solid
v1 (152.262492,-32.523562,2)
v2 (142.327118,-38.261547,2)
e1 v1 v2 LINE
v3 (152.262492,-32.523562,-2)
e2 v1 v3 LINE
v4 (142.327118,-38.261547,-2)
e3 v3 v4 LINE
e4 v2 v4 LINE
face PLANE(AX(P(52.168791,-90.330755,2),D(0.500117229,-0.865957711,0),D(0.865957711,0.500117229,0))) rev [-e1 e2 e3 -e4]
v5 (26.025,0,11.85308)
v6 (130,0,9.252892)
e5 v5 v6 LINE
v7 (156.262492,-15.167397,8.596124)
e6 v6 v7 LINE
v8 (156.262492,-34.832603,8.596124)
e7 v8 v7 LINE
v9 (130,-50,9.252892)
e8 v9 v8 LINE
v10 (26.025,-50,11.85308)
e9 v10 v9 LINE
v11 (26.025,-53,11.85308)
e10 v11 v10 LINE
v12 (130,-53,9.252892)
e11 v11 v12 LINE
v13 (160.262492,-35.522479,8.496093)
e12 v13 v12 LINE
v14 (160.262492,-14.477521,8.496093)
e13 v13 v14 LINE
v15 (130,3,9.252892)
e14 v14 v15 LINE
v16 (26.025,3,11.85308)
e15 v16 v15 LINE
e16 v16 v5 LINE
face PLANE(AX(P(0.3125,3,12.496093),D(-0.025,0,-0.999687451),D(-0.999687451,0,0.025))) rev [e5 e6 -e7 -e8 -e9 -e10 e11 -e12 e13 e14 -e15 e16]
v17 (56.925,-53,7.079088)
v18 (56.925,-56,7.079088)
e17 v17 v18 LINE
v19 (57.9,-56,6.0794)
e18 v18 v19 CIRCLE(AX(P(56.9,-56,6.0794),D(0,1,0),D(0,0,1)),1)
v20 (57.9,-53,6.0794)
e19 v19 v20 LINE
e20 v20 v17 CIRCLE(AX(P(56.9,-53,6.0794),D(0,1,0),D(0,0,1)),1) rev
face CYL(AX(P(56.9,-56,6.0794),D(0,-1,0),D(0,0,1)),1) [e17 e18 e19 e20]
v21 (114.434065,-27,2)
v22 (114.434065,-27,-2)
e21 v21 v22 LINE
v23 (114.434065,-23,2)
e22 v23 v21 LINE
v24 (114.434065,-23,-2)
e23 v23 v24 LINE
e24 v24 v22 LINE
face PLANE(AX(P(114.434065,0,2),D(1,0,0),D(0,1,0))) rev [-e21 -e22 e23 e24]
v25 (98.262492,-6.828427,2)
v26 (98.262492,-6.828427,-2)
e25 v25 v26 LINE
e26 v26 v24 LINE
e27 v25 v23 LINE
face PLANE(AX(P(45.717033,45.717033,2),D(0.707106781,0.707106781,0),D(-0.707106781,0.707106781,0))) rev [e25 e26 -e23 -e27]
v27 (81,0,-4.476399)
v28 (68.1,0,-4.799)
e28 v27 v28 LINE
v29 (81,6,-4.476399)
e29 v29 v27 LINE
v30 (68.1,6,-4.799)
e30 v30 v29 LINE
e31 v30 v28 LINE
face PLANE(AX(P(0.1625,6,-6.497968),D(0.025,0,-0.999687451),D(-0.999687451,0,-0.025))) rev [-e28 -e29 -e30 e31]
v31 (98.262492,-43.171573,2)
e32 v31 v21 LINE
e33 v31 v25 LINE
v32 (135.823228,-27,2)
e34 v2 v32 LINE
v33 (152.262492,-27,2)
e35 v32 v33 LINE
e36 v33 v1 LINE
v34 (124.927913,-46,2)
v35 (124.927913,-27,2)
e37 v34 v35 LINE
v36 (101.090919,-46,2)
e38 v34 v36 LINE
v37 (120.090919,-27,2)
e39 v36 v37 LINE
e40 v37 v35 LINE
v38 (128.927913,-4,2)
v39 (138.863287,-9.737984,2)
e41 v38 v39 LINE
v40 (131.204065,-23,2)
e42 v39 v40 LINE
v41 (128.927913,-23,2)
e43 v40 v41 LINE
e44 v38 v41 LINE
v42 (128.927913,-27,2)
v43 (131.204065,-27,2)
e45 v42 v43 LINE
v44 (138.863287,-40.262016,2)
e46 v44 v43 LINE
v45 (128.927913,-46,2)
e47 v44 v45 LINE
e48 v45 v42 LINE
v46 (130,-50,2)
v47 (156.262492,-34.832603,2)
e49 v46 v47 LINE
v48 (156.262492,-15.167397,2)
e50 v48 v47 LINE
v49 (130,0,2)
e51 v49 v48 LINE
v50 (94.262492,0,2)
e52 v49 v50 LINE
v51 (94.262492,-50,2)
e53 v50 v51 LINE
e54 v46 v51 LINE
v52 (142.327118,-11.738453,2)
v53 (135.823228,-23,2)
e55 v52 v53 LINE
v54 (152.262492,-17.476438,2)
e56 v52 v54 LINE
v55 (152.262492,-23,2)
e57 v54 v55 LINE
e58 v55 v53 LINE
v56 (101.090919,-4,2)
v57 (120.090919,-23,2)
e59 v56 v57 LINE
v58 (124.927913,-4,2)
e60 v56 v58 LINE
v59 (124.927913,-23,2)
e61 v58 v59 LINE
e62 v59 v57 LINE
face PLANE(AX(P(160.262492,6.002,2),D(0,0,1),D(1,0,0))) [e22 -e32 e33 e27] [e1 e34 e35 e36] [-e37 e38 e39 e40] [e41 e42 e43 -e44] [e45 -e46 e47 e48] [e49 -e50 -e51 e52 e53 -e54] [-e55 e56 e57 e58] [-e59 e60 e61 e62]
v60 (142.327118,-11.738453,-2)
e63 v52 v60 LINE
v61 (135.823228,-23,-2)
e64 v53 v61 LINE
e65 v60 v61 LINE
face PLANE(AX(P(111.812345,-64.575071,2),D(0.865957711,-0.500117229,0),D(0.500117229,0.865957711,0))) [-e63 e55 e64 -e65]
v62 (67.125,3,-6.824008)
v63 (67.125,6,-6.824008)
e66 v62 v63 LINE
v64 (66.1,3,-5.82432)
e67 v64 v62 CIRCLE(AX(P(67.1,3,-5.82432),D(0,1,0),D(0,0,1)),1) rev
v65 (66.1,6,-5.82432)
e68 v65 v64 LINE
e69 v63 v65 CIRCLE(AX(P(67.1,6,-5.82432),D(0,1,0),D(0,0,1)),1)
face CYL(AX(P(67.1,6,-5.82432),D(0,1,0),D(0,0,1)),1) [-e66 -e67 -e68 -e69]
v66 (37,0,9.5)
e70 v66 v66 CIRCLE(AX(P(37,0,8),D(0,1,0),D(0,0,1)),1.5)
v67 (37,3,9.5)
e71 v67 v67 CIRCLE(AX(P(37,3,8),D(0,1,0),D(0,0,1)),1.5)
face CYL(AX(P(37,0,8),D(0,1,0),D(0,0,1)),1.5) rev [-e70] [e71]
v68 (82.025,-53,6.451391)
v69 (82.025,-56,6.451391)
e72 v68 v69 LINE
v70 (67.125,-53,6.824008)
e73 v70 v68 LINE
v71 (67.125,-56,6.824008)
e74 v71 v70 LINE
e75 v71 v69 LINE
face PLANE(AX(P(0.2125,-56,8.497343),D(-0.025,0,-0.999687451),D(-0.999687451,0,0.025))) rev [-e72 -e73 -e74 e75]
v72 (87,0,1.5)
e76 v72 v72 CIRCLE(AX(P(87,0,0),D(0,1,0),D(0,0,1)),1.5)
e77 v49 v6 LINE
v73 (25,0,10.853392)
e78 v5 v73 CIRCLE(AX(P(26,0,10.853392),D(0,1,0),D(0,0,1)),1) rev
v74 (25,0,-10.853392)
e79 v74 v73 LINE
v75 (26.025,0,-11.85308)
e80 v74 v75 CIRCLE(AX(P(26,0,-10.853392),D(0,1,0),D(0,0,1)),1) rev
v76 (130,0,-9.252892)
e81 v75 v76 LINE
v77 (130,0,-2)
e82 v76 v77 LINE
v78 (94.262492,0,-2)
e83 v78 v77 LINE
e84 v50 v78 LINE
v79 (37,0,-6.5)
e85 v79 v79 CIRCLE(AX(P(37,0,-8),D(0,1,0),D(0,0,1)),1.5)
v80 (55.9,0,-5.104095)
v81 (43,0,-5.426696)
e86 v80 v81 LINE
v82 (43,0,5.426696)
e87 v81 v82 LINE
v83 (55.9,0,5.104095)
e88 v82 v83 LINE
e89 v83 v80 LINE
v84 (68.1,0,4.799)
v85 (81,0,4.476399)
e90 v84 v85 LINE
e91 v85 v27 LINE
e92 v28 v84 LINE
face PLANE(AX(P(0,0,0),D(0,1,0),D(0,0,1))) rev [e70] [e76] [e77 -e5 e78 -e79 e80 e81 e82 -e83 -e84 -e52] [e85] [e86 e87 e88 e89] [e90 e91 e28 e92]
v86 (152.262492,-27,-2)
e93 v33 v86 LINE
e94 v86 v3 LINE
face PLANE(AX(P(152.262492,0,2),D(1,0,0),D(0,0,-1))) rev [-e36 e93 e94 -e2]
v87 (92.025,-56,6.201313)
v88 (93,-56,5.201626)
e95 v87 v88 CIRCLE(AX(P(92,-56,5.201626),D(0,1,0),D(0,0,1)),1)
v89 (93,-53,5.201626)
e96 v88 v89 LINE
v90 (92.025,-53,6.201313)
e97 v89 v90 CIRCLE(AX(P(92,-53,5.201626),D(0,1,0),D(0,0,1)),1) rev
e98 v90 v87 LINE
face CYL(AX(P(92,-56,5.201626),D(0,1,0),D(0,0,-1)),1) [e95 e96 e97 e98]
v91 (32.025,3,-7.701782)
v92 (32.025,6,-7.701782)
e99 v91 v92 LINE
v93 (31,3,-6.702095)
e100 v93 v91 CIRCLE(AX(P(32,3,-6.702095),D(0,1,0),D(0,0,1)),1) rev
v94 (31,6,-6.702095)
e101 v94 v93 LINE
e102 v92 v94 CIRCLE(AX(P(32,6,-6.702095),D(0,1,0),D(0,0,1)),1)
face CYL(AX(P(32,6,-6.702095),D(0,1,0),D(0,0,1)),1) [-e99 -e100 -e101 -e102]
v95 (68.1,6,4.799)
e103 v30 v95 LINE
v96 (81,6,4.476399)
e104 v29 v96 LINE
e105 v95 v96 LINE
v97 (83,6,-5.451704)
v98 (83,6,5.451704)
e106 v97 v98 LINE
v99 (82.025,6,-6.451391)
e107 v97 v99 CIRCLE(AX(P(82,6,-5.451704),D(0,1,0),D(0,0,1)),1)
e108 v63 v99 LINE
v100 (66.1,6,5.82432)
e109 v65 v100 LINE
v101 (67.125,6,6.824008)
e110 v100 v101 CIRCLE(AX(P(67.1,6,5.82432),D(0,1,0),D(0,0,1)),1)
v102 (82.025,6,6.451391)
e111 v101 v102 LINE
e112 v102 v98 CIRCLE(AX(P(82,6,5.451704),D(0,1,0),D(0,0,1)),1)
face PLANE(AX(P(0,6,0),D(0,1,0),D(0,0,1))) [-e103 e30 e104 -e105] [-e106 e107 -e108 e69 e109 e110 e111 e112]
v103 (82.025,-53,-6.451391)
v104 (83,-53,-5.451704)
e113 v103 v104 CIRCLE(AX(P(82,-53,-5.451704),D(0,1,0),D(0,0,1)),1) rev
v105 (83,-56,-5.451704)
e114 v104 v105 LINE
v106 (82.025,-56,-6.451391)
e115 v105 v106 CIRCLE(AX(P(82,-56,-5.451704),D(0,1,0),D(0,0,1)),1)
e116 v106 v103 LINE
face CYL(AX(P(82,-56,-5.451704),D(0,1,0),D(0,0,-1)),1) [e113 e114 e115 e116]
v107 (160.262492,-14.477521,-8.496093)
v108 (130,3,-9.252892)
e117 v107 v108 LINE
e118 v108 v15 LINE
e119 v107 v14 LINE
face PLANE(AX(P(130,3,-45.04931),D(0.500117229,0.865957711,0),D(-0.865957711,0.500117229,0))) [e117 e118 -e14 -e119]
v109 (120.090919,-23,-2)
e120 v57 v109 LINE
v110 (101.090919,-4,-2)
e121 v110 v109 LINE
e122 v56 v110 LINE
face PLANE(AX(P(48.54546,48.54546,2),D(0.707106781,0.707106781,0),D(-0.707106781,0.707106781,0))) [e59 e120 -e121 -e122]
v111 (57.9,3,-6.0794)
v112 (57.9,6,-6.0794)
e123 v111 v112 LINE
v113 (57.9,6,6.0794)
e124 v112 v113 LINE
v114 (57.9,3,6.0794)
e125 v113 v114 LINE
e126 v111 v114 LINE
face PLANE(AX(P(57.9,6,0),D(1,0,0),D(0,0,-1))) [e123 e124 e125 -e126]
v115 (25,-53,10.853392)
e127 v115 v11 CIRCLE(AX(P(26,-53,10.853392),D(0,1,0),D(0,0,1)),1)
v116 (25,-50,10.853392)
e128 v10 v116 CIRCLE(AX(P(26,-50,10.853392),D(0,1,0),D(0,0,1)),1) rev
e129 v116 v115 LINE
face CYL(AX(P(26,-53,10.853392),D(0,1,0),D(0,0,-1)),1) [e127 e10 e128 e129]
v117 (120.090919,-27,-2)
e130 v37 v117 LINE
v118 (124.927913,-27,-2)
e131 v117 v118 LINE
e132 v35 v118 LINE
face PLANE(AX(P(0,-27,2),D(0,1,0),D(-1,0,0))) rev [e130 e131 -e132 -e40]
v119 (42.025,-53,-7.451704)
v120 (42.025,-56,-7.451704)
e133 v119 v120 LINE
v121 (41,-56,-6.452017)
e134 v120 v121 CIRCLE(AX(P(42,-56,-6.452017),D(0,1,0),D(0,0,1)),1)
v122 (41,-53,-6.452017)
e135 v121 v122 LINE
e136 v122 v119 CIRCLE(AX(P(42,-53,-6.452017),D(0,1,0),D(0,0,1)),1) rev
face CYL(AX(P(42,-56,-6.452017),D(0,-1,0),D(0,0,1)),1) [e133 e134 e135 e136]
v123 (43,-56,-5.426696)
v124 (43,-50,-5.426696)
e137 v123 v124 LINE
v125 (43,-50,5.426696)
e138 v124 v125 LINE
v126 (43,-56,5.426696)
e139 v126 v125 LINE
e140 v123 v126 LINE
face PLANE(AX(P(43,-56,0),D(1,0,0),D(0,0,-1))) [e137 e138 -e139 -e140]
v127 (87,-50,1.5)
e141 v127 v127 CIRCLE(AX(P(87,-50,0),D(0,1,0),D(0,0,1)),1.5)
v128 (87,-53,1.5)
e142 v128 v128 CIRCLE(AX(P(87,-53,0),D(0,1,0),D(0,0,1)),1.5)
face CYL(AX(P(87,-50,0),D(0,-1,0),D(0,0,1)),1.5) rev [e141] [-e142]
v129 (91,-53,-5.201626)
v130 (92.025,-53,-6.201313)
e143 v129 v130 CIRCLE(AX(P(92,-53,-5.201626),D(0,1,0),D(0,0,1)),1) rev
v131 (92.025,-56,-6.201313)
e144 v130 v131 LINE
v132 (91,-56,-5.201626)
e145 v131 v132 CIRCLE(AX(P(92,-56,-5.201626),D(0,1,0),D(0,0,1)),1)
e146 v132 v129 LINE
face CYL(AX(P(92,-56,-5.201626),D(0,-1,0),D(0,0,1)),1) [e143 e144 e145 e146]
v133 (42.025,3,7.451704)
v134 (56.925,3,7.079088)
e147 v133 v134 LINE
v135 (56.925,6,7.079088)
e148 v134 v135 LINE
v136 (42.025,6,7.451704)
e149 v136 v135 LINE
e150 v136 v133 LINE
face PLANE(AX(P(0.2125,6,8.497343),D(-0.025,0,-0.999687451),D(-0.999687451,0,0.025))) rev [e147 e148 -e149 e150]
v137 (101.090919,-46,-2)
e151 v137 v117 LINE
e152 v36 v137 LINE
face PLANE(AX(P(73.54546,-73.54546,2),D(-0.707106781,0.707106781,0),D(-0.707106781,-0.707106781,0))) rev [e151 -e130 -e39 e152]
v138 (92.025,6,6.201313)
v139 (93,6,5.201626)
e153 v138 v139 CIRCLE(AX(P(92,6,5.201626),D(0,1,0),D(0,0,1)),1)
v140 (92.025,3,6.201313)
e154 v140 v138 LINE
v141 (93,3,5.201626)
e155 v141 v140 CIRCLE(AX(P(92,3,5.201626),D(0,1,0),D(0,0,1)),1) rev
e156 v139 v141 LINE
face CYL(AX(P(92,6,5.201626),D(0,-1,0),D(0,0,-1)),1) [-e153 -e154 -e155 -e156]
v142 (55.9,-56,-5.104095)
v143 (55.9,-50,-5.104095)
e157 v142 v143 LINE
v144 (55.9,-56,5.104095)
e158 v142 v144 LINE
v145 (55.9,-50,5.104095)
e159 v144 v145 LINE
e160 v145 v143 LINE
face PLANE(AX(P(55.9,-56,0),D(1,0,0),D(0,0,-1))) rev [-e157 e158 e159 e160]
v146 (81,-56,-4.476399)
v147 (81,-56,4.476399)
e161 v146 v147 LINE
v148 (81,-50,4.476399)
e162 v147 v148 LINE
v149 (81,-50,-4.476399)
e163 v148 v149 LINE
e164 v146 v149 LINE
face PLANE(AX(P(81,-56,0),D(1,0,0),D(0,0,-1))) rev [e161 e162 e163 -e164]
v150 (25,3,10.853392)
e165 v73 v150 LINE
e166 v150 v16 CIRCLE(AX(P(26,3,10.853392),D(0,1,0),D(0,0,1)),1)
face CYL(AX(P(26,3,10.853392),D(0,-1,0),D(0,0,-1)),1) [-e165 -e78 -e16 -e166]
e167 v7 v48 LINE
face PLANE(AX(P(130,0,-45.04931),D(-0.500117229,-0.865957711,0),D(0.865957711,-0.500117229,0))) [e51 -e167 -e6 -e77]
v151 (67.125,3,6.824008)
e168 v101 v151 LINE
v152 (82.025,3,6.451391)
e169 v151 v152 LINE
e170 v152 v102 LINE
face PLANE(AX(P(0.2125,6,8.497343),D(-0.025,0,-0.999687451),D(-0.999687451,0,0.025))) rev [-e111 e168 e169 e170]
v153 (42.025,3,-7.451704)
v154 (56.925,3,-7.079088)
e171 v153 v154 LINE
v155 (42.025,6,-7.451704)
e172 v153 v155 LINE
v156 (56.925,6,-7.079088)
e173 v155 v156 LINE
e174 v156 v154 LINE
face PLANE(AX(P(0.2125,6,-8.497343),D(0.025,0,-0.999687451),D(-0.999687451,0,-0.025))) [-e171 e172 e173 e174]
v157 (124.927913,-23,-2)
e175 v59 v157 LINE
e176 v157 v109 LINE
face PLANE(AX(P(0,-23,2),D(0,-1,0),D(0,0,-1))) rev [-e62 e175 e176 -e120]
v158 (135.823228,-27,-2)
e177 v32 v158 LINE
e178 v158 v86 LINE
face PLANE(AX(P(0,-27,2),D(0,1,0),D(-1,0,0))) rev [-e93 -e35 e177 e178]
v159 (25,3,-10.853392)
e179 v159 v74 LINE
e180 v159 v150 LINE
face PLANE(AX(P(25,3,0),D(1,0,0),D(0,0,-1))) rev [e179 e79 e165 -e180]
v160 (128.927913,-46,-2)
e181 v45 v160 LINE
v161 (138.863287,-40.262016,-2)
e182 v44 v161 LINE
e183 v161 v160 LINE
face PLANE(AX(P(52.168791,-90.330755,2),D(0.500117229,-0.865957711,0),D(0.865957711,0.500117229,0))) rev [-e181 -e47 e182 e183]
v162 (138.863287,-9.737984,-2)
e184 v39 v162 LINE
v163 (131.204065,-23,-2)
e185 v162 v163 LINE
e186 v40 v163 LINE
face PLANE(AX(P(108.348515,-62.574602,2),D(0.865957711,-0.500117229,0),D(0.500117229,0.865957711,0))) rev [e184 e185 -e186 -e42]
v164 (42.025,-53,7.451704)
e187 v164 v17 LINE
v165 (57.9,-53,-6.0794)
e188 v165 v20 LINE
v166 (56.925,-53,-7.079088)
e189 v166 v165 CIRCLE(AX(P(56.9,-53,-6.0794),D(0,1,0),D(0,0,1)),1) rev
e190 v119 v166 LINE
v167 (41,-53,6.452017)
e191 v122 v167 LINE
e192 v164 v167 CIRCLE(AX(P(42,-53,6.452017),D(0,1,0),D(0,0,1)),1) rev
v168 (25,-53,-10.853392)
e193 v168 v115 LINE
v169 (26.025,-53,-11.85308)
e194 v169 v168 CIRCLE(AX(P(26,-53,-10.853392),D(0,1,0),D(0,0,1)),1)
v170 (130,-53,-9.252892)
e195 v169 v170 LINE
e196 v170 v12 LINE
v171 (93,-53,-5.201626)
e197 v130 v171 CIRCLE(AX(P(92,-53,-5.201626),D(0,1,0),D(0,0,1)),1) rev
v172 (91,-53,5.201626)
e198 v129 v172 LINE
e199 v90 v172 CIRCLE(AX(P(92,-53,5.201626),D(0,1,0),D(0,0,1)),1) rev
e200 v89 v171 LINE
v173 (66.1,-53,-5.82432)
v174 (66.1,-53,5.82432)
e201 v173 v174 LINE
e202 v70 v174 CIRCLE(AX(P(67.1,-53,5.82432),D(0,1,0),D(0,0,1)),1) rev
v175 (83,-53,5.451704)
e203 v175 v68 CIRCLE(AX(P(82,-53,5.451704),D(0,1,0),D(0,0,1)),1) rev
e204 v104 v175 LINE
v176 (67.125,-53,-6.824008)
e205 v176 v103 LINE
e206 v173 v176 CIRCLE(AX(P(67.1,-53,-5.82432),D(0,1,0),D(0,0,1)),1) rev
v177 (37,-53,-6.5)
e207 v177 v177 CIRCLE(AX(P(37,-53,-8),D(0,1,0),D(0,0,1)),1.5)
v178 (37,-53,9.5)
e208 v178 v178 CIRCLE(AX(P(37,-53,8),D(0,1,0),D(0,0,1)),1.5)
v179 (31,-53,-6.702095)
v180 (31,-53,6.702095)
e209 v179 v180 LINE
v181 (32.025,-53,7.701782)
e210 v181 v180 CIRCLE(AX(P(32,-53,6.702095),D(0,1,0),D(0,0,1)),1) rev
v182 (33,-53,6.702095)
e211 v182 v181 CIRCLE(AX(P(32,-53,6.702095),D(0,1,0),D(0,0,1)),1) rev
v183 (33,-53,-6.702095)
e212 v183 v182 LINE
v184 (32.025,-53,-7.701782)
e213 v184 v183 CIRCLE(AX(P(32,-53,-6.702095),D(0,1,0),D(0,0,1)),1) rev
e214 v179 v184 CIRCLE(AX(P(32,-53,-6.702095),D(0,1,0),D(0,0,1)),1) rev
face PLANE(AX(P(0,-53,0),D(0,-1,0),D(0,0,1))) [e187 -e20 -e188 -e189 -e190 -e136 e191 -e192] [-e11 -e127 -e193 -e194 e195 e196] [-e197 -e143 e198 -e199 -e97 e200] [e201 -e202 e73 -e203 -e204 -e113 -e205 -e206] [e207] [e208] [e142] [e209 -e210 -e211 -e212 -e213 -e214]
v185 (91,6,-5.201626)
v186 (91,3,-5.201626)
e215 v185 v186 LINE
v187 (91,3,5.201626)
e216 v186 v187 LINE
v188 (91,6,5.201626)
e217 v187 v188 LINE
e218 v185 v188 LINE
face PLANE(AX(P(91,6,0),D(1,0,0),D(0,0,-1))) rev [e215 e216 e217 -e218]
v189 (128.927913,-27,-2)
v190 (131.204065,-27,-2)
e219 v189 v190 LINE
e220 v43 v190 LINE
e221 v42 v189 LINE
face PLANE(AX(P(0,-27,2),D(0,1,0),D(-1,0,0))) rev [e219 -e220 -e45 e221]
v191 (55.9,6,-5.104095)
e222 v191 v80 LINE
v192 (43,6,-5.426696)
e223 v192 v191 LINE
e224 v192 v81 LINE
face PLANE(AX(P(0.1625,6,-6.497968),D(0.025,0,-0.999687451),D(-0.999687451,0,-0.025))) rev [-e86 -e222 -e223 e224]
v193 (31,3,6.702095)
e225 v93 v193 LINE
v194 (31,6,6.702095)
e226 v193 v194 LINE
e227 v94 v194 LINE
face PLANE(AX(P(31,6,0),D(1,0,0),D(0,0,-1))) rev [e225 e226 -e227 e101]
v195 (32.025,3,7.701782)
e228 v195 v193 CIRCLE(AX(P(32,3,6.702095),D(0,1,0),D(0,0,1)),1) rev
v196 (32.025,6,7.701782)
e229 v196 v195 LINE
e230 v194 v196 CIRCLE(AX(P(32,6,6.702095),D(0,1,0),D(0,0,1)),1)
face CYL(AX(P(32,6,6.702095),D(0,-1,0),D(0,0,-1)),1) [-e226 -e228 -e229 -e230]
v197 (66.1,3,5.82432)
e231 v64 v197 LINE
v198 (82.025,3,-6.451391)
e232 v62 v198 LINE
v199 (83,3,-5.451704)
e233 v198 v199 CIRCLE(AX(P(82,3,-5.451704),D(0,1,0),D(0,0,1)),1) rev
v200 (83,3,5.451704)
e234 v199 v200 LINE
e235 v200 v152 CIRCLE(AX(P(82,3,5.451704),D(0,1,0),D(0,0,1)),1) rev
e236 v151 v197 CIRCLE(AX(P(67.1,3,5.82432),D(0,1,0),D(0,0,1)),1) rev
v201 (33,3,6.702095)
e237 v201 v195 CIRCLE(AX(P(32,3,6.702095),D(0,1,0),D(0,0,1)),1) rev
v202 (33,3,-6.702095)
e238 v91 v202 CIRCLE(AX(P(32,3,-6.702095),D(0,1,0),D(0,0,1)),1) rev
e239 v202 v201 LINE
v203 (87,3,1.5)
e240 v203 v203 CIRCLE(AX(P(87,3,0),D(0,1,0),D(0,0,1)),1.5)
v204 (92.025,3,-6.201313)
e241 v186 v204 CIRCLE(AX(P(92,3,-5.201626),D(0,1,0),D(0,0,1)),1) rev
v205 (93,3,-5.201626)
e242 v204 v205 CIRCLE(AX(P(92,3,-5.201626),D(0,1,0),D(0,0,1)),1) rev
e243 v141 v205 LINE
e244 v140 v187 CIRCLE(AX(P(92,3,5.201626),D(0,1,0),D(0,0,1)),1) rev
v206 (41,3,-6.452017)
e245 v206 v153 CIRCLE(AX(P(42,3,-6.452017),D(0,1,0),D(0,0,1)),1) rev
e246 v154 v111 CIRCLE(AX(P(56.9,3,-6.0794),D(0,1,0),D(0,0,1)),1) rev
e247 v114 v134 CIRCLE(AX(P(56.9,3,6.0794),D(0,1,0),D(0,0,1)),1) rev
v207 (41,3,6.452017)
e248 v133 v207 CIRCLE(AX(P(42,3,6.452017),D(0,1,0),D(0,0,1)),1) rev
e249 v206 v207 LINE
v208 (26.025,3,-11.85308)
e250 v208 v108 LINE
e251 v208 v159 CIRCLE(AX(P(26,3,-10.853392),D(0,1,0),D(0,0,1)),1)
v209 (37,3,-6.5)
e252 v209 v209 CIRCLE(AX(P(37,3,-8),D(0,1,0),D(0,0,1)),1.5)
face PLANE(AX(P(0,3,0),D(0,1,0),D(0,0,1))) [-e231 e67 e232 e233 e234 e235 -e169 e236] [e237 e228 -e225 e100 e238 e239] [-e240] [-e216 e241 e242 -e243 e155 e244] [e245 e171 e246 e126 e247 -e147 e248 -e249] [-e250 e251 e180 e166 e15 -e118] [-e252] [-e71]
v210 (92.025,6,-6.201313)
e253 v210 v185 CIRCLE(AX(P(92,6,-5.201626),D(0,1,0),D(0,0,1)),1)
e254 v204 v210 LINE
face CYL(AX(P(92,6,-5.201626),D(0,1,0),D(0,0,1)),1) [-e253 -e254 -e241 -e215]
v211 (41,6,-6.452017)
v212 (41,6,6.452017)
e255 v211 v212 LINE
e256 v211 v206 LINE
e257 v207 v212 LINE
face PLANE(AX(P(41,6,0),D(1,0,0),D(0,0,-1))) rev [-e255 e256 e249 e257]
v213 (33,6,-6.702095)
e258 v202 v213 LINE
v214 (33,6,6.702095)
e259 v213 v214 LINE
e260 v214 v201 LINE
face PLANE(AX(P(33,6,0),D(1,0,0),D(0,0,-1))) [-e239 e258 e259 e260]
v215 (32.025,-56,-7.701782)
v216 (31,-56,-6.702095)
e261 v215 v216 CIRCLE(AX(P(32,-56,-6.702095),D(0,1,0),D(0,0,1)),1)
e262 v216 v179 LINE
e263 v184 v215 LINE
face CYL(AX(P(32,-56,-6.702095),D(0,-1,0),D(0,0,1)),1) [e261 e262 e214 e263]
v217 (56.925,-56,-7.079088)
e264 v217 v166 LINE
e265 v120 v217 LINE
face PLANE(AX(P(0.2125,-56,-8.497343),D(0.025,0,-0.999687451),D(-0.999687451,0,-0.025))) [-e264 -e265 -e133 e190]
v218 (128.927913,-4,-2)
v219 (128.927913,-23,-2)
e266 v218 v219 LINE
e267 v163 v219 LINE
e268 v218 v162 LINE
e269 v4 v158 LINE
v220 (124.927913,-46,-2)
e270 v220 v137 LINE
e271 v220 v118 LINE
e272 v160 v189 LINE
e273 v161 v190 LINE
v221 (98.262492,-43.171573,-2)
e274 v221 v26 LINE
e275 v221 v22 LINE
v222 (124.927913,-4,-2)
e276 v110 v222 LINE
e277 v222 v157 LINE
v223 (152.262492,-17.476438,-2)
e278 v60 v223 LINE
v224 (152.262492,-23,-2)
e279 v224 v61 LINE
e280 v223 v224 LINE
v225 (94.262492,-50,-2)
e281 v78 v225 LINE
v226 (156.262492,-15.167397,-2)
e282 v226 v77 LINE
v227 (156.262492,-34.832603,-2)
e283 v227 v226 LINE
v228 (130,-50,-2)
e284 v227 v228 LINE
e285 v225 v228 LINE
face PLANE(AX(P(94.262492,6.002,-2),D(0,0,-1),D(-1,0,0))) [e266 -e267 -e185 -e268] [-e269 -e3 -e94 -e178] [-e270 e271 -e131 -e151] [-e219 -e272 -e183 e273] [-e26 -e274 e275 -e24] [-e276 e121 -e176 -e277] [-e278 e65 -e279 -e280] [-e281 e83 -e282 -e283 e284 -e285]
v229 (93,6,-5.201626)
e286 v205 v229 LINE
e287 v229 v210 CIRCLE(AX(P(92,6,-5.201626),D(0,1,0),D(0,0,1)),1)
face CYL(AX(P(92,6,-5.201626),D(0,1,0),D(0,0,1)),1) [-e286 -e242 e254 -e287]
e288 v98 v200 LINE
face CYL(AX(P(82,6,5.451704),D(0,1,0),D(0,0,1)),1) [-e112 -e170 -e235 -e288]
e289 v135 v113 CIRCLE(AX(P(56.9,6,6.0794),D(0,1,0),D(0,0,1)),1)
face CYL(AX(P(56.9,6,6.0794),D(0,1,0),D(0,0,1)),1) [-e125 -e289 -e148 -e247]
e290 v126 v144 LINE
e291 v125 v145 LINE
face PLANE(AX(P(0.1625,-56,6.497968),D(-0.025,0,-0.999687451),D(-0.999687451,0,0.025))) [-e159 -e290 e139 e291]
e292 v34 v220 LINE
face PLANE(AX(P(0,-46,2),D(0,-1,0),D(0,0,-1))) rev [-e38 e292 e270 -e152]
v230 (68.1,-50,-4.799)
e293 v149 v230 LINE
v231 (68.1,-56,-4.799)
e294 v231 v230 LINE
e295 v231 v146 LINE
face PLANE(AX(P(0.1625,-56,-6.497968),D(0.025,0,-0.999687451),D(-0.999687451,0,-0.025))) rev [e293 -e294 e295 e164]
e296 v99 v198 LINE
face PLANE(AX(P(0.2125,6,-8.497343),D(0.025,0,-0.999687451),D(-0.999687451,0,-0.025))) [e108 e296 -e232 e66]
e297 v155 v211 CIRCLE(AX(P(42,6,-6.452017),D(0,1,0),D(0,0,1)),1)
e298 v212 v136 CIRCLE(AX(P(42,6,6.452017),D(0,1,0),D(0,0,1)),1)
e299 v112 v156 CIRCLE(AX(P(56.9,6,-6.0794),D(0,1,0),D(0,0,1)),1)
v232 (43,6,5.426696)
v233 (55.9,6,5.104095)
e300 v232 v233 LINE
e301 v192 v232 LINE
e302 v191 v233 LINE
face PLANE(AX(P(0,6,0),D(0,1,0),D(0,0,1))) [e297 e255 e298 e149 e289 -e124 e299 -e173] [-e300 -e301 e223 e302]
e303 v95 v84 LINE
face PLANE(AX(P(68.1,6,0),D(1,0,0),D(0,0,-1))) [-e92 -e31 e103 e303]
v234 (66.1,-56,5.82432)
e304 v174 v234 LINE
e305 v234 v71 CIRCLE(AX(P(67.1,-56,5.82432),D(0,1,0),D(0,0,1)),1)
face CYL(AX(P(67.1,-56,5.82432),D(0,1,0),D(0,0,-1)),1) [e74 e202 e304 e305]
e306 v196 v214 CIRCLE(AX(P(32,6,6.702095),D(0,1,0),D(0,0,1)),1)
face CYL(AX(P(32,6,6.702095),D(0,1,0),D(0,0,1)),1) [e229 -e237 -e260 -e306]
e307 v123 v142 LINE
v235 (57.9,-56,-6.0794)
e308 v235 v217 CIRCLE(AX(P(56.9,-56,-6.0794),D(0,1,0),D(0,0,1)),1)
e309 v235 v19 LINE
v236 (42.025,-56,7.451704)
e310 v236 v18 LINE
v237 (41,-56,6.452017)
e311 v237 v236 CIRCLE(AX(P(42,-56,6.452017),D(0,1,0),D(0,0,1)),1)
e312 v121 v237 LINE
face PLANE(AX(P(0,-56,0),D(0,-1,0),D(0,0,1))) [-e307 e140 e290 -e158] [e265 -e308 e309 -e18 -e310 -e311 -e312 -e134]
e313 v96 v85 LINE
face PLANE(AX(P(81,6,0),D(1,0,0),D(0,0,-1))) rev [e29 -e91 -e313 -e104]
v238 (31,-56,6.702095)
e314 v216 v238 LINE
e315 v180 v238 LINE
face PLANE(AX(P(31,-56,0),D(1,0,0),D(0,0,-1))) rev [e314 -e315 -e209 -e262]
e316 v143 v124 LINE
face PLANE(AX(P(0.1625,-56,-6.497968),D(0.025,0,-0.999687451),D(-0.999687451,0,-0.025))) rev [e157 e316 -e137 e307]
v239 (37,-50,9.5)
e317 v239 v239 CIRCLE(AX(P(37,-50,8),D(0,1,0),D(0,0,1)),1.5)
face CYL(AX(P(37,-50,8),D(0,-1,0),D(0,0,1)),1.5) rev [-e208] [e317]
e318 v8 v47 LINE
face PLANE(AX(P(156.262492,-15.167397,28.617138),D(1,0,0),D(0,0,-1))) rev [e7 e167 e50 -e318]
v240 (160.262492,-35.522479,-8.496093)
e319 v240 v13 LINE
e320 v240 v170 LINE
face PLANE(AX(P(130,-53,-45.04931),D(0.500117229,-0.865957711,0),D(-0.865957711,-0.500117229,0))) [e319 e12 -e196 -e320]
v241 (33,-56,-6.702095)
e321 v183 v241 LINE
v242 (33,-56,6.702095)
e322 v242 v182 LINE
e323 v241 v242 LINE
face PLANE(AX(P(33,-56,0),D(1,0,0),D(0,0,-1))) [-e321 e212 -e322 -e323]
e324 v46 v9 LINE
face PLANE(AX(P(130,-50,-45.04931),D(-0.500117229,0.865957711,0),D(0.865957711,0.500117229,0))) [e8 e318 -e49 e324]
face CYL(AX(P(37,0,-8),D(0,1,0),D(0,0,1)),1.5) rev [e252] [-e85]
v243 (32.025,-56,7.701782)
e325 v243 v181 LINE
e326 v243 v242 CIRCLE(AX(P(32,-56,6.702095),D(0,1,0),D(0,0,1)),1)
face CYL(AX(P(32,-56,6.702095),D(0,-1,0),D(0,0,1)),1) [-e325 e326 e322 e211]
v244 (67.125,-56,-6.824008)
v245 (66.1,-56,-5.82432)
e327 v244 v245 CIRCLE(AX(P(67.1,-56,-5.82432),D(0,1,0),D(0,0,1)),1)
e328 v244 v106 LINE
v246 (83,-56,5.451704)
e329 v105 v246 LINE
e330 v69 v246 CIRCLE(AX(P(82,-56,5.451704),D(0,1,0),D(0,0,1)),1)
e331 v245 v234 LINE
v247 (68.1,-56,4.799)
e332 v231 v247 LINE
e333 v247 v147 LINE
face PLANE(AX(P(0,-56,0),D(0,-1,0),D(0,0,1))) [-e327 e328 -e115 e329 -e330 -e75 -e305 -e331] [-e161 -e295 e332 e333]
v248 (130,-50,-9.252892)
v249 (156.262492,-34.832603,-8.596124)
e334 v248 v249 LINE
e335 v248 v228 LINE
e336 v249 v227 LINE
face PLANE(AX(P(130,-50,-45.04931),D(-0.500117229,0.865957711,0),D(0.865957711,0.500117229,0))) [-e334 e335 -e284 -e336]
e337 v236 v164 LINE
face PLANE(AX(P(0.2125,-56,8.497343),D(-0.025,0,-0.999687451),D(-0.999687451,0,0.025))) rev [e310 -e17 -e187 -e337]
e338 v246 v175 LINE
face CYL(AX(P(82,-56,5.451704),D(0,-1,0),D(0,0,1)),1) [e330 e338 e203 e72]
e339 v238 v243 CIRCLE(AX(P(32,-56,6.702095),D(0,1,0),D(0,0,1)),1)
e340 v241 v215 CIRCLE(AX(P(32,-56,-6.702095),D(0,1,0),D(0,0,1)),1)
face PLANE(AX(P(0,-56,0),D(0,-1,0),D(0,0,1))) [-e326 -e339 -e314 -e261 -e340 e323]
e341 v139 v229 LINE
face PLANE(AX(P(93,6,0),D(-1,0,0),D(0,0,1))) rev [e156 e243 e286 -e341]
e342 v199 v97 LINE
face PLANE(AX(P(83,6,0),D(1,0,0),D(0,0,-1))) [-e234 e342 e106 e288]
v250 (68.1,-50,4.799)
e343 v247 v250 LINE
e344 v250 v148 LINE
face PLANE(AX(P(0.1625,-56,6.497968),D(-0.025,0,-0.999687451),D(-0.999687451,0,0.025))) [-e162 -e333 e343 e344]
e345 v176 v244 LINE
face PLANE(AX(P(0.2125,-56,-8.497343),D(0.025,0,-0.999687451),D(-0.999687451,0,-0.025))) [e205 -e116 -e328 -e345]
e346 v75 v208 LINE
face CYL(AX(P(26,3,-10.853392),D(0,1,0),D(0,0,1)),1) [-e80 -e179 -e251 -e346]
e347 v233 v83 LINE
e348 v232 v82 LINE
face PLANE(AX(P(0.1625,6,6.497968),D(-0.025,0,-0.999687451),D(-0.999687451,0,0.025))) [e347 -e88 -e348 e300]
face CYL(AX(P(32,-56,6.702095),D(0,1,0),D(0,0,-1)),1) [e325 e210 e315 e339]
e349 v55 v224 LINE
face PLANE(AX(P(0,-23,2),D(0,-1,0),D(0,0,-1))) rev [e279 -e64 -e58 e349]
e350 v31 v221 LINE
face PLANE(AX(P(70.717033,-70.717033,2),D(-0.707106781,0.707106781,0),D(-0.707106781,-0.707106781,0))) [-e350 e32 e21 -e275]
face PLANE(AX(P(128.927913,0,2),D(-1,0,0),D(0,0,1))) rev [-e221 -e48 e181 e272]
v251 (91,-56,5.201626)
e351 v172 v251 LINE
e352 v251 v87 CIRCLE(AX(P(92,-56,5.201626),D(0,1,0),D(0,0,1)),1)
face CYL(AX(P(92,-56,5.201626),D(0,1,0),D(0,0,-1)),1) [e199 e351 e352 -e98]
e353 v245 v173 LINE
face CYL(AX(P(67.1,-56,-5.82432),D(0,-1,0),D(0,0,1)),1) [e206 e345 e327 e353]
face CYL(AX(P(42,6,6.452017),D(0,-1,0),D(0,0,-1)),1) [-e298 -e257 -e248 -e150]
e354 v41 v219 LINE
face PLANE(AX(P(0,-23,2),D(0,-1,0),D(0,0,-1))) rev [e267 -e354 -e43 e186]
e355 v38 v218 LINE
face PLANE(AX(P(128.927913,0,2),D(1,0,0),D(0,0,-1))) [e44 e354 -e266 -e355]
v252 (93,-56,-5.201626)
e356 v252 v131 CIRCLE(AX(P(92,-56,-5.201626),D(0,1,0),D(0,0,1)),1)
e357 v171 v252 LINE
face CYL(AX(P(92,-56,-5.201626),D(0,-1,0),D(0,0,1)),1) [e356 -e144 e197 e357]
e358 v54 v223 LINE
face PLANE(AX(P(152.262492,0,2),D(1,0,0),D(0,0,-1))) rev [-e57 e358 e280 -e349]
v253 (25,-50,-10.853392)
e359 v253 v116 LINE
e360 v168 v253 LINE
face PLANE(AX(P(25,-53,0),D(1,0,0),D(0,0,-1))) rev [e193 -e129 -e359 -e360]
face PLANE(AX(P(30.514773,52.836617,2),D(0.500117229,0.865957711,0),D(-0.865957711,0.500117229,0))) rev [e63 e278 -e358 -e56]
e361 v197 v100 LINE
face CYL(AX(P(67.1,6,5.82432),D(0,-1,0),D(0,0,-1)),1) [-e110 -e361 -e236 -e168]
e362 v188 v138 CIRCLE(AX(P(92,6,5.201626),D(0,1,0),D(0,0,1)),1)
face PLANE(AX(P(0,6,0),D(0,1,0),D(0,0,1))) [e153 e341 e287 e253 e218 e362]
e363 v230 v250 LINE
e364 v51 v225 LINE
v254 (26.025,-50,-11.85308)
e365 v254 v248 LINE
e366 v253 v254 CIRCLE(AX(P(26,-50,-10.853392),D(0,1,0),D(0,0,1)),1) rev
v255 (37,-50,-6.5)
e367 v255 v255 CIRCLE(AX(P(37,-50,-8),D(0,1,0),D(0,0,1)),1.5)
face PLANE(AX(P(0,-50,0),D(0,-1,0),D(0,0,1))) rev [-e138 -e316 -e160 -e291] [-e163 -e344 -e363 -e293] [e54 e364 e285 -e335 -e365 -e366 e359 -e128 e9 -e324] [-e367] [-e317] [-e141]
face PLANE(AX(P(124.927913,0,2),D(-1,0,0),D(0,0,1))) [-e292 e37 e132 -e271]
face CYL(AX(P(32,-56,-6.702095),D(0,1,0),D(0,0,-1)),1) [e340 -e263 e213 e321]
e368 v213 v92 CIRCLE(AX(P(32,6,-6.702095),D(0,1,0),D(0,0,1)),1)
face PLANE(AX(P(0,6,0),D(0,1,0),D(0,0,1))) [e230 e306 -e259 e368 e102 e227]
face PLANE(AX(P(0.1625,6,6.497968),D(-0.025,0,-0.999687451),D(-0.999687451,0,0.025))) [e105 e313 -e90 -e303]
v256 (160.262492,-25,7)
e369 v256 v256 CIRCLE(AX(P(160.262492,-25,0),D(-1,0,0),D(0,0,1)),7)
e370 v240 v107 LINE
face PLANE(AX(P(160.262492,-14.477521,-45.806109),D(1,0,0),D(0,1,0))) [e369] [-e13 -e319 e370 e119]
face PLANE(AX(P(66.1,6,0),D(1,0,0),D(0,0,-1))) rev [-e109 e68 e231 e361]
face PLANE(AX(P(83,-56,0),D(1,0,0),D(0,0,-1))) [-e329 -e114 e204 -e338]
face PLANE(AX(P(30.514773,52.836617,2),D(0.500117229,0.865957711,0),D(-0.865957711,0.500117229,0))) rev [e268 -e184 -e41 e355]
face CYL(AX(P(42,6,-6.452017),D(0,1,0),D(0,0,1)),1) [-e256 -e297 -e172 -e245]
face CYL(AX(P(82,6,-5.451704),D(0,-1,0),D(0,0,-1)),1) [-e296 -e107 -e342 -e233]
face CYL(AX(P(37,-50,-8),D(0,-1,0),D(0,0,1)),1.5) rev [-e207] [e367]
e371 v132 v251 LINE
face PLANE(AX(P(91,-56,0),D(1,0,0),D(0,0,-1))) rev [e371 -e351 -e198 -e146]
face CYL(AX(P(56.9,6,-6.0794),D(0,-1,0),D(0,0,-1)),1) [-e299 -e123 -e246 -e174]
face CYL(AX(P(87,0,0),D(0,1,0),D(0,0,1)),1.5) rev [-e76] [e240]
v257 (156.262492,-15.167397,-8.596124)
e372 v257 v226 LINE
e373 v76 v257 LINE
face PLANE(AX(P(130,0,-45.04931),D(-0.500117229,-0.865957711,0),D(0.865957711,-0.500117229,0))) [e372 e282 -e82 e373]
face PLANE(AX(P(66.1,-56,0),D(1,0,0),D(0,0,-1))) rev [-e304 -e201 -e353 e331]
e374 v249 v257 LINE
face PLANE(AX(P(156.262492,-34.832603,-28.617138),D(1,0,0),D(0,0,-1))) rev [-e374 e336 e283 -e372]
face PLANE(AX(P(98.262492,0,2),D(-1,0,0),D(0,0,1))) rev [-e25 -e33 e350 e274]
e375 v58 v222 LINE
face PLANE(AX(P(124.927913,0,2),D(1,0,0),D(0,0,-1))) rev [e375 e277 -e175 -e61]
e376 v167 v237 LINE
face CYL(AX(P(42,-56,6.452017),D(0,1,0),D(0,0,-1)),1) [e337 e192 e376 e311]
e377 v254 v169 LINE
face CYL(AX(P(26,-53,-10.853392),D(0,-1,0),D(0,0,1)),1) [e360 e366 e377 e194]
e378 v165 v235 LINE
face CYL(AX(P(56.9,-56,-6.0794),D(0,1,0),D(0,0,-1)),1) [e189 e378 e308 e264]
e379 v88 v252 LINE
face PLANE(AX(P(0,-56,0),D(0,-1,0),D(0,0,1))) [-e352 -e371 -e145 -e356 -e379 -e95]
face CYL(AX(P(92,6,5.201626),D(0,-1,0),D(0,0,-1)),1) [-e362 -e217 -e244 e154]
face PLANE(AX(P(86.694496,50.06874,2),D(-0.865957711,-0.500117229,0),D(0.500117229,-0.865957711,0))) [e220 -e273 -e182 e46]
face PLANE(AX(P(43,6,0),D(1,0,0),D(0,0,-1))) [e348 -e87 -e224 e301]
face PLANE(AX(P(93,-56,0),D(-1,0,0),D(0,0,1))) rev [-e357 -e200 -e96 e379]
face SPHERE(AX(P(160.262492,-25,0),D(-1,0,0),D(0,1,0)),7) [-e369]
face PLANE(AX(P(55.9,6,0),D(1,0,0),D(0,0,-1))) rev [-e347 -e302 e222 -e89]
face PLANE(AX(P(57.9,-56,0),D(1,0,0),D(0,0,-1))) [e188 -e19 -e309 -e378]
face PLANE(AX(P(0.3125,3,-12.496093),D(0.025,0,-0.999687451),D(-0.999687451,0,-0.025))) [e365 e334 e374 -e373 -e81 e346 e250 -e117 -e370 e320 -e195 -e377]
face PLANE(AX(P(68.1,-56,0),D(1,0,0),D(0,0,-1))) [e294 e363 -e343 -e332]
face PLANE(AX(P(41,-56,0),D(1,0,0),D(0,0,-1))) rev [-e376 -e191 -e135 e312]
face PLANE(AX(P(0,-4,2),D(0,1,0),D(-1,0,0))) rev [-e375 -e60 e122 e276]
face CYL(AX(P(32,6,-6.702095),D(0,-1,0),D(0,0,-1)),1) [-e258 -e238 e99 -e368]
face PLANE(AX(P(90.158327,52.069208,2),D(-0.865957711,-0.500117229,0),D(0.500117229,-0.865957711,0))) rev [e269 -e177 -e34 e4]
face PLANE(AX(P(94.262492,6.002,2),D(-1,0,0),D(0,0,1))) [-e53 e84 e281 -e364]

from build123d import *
from build123d.topology import SkipClean

# Parameters (mm, degrees)
EXTRUDE_1_DEPTH     = 3
SKETCH_2_R          = 1.5
CUT_EXTRUDE_1_DEPTH = 3
EXTRUDE_2_DEPTH     = 3
FILLET_1_R          = 1
FILLET_2_R          = 1
CUT_EXTRUDE_2_DEPTH = 3
EXTRUDE_START       = -17.477520588
EXTRUDE_3_DEPTH     = 20.477520588
EXTRUDE_START_2     = -11.853392215
EXTRUDE_3_2_DEPTH   = 23.70678443
EXTRUDE_4_REACH     = 165.663
SKETCH_6_W          = 66
SKETCH_6_H          = 4
EXTRUDE_6_REACH     = 172.329
EXTRUDE_7_REACH     = 172.329
CUT_EXTRUDE_3_DEPTH = 4


with BuildPart() as part:
    # 草图1 → 凸台-拉伸1 (new body)
    with BuildSketch(Plane(origin=(0, 0, 0), x_dir=(1, 0, 0), z_dir=(0, 1, 0))):
        Polygon((25, 11.878712678), (25, -11.878712678), (130, -9.252891981), (130, 9.252891981), align=None)
    extrude(amount=EXTRUDE_1_DEPTH)

    # 草图2 → 切除-拉伸1 (cut)
    with BuildSketch(Plane(origin=(0, 3, 0), x_dir=(1, 0, 0), z_dir=(0, 1, 0))):
        with Locations(Location((37, 8, 0), (0, 0, 270))):
            Circle(SKETCH_2_R)
        with Locations(Location((37, -8, 0), (0, 0, 270))):
            Circle(SKETCH_2_R)
        with Locations(Location((87, 0, 0), (0, 0, 270))):
            Circle(SKETCH_2_R)
    extrude(amount=-CUT_EXTRUDE_1_DEPTH, mode=Mode.SUBTRACT)

    # 草图3 → 凸台-拉伸2 (add)
    with BuildSketch(Plane(origin=(0, 3, 0), x_dir=(1, 0, 0), z_dir=(0, 1, 0))):
        Polygon((33, 5.676774269), (33, 7.677399562), (31, 7.727415195), (31, 5.726789902), align=None)
        Polygon((33, 0), (33, 5.676774269), (31, 5.726789902), (31, 0), align=None)
        Polygon((33, -5.676774269), (33, 0), (31, 0), (31, -5.726789902), align=None)
        Polygon((33, -7.677399562), (33, -5.676774269), (31, -5.726789902), (31, -7.727415195), align=None)
        Polygon((43, 7.427321401), (41, 7.477337033), (41, 5.47671174), (43, 5.426696108), align=None)
        Polygon((43, 5.426696108), (41, 5.47671174), (41, 0), (43, 0), align=None)
        Polygon((43, 0), (41, 0), (41, -5.47671174), (43, -5.426696108), align=None)
        Polygon((43, -5.426696108), (41, -5.47671174), (41, -7.477337033), (43, -7.427321401), align=None)
        Polygon((55.9, 7.104720572), (43, 7.427321401), (43, 5.426696108), (55.9, 5.104095279), align=None)
        Polygon((55.9, -5.104095279), (43, -5.426696108), (43, -7.427321401), (55.9, -7.104720572), align=None)
        Polygon((57.9, 7.05470494), (55.9, 7.104720572), (55.9, 5.104095279), (57.9, 5.054079647), align=None)
        Polygon((57.9, 5.054079647), (55.9, 5.104095279), (55.9, 0), (57.9, 0), align=None)
        Polygon((57.9, 0), (55.9, 0), (55.9, -5.104095279), (57.9, -5.054079647), align=None)
        Polygon((57.9, -5.054079647), (55.9, -5.104095279), (55.9, -7.104720572), (57.9, -7.05470494), align=None)
        Polygon((68.1, 6.799625215), (66.1, 6.849640847), (66.1, 4.849015554), (68.1, 4.798999922), align=None)
        Polygon((68.1, 4.798999922), (66.1, 4.849015554), (66.1, 0), (68.1, 0), align=None)
        Polygon((68.1, 0), (66.1, 0), (66.1, -4.849015554), (68.1, -4.798999922), align=None)
        Polygon((68.1, -4.798999922), (66.1, -4.849015554), (66.1, -6.849640847), (68.1, -6.799625215), align=None)
        Polygon((81, 6.477024386), (68.1, 6.799625215), (68.1, 4.798999922), (81, 4.476399093), align=None)
        Polygon((81, -4.476399093), (68.1, -4.798999922), (68.1, -6.799625215), (81, -6.477024386), align=None)
        Polygon((83, -4.426383461), (81, -4.476399093), (81, -6.477024386), (83, -6.427008754), align=None)
        Polygon((83, 0), (81, 0), (81, -4.476399093), (83, -4.426383461), align=None)
        Polygon((83, 4.426383461), (81, 4.476399093), (81, 0), (83, 0), align=None)
        Polygon((83, 6.427008754), (81, 6.477024386), (81, 4.476399093), (83, 4.426383461), align=None)
        Polygon((93, 6.176930593), (91, 6.226946225), (91, 4.226320932), (93, 4.176305299), align=None)
        Polygon((93, 4.176305299), (91, 4.226320932), (91, 0), (93, 0), align=None)
        Polygon((93, 0), (91, 0), (91, -4.226320932), (93, -4.176305299), align=None)
        Polygon((93, -4.176305299), (91, -4.226320932), (91, -6.226946225), (93, -6.176930593), align=None)
    extrude(amount=EXTRUDE_2_DEPTH)

    # 圆角1
    fillet_1_edges = [part.edges().sort_by_distance(p)[0] for p in [
        (91, 4.5, -6.226946225),
        (91, 4.5, 6.226946225),
        (93, 4.5, 6.176930593),
        (93, 4.5, -6.176930593),
        (31, 4.5, -7.727415195),
        (31, 4.5, 7.727415195),
        (33, 4.5, 7.677399562),
        (33, 4.5, -7.677399562),
        (41, 4.5, 7.477337033),
        (57.9, 4.5, 7.05470494),
        (57.9, 4.5, -7.05470494),
        (41, 4.5, -7.477337033),
        (66.1, 4.5, 6.849640847),
        (83, 4.5, 6.427008754),
        (83, 4.5, -6.427008754),
        (66.1, 4.5, -6.849640847),
    ]]
    fillet(fillet_1_edges, radius=FILLET_1_R - 0.0001)  # a hair under: the kernel refuses the full size

    # 圆角2
    fillet_2_edges = [part.edges().sort_by_distance(p)[0] for p in [
        (25, 1.5, 11.878712678),
        (25, 1.5, -11.878712678),
    ]]
    fillet(fillet_2_edges, radius=FILLET_2_R)

    # 草图4 → 切除-拉伸2 (cut)
    with BuildSketch(Plane(origin=(0, 3, 0), x_dir=(1, 0, 0), z_dir=(0, 1, 0))):
        Polygon((43, 5.426696108), (55.9, 5.104095279), (55.9, -5.104095279), (43, -5.426696108), align=None)
        Polygon((68.1, 4.798999922), (81, 4.476399093), (81, -4.476399093), (68.1, -4.798999922), align=None)
    extrude(amount=-CUT_EXTRUDE_2_DEPTH, mode=Mode.SUBTRACT)

    # 凸台-拉伸3: read off the stored shape, not the designer's step
    # 凸台-拉伸3 outline → 凸台-拉伸3 (add)
    with BuildSketch(Plane(origin=(0, 0, 0), x_dir=(1, 0, 0), z_dir=(0, 1, 0)).offset(EXTRUDE_START)):
        Polygon((130, -9.25289198), (160.262492185, -8.496093139), (160.262492185, 8.496093139), (130, 9.25289198), align=None)
    extrude(amount=EXTRUDE_3_DEPTH)

    # Extrude 3 2 outline → Extrude 3 2 (cut)
    with BuildSketch(Plane.XY.offset(EXTRUDE_START_2)):
        Polygon((130, 3), (160.262492185, -14.477520588), (160.262492185, 3), align=None)
        Polygon((160.262492185, -17.477520588), (130, 0), (130, -17.477520588), align=None)
    extrude(amount=EXTRUDE_3_2_DEPTH, mode=Mode.SUBTRACT)

    # 草图6 → 凸台-拉伸4 (add, up to next)
    with BuildSketch(Plane(origin=(0, -25, 0), x_dir=(-1, 0, 0), z_dir=(0, -1, 0)), mode=Mode.PRIVATE) as extrude_4_sk1:
        with Locations((-127.262492185, 0)):
            Rectangle(SKETCH_6_W, SKETCH_6_H)
    extrude_4_tool1 = extrude(extrude_4_sk1.sketch, amount=-EXTRUDE_4_REACH, mode=Mode.PRIVATE) - part.part
    add(extrude_4_tool1.solids().sort_by_distance((127.262492, -25, 0))[0])

    # 镜向21: part across plane


with BuildPart() as part_1:
    add(part.part)
    add(part.part.mirror(Plane(origin=(0, -25, 0), x_dir=(0, 0, 1), z_dir=(0, -1, 0))))

    # 凸台-拉伸6: up to this plane
    extrude_6_end = Plane(origin=(0.3125, 3, -12.496093139), z_dir=(0.024999999999999984, 0, -0.9996874511566103))
    # 草图8 → 凸台-拉伸6 (add, up to the surface)
    with BuildSketch(Plane(origin=(0, 0, -2), x_dir=(-1, 0, 0), z_dir=(0, 0, -1)), mode=Mode.PRIVATE) as extrude_6_sk1:
        Polygon((-160.262492185, -17.477520588), (-160.262492185, -32.522479412), (-156.262492185, -34.832602515), (-156.262492185, -15.167397485), align=None)
    extrude_6_tool1 = split(extrude(extrude_6_sk1.sketch, amount=EXTRUDE_6_REACH, mode=Mode.PRIVATE), bisect_by=extrude_6_end, keep=Keep.BOTH, mode=Mode.PRIVATE)
    add(extrude_6_tool1.solids().sort_by_distance((158.173753, -25, -2))[0])

    # 凸台-拉伸7: up to this plane
    extrude_7_end = Plane(origin=(0.3125, 3, 12.496093139), z_dir=(-0.024999999999999984, 0, -0.9996874511566103))
    # 草图9 → 凸台-拉伸7 (add, up to the surface)
    with BuildSketch(Plane.XY.offset(2), mode=Mode.PRIVATE) as extrude_7_sk1:
        Polygon((160.262492185, -17.477520588), (156.262492185, -15.167397485), (156.262492185, -34.832602515), (160.262492185, -32.522479412), align=None)
    extrude_7_tool1 = split(extrude(extrude_7_sk1.sketch, amount=EXTRUDE_7_REACH, mode=Mode.PRIVATE), bisect_by=extrude_7_end, keep=Keep.BOTH, mode=Mode.PRIVATE)
    add(extrude_7_tool1.solids().sort_by_distance((158.173753, -25, 2))[0])

    # 草图10 → 切除-拉伸3 (cut)
    with BuildSketch(Plane(origin=(0, 0, -2), x_dir=(-1, 0, 0), z_dir=(0, 0, -1))):
        Polygon((-142.327118039, -11.738453253), (-152.262492185, -17.476437591), (-152.262492185, -23), (-135.82322821, -23), align=None)
        Polygon((-135.82322821, -27), (-152.262492185, -27), (-152.262492185, -32.523562409), (-142.327118039, -38.261546747), align=None)
        Polygon((-128.927913048, -4), (-138.863287194, -9.737984338), (-131.204065001, -23), (-128.927913048, -23), align=None)
        Polygon((-128.927913048, -27), (-131.204065001, -27), (-138.863287194, -40.262015662), (-128.927913048, -46), align=None)
        Polygon((-101.09091931, -4), (-124.927913048, -4), (-124.927913048, -23), (-120.09091931, -23), align=None)
        Polygon((-120.09091931, -27), (-124.927913048, -27), (-124.927913048, -46), (-101.09091931, -46), align=None)
        Polygon((-98.262492185, -6.828427125), (-114.43406506, -23), (-114.43406506, -27), (-98.262492185, -43.171572875), align=None)
    extrude(amount=-CUT_EXTRUDE_3_DEPTH, mode=Mode.SUBTRACT)

    # 草图11 → 旋转1 (revolve)
    with SkipClean():  # the faces are left unmerged after this step: merging them gives an invalid solid
        with BuildSketch(Plane.XY, mode=Mode.PRIVATE) as revolve_1_sk:
            with BuildLine():
                Line((160.262492185, -25), (160.262492185, -32))
                ThreePointArc((160.262492185, -32), (165.212239653, -29.949747468), (167.262492185, -25))
                Line((167.262492185, -25), (160.262492185, -25))
            make_face()
            with BuildLine():
                Line((160.262492185, -18), (160.262492185, -25))
                Line((160.262492185, -25), (167.262492185, -25))
                ThreePointArc((167.262492185, -25), (165.212239653, -20.050252532), (160.262492185, -18))
            make_face()
        revolve(revolve_1_sk.sketch.rotate(Axis((160.262492185, -25, 0), (1, 0, 0)), 180), axis=Axis((160.262492185, -25, 0), (1, 0, 0)))
    add(part_1.part.scale(1), mode=Mode.REPLACE)  # the faces are merged on a copy


solid = part_1.part
